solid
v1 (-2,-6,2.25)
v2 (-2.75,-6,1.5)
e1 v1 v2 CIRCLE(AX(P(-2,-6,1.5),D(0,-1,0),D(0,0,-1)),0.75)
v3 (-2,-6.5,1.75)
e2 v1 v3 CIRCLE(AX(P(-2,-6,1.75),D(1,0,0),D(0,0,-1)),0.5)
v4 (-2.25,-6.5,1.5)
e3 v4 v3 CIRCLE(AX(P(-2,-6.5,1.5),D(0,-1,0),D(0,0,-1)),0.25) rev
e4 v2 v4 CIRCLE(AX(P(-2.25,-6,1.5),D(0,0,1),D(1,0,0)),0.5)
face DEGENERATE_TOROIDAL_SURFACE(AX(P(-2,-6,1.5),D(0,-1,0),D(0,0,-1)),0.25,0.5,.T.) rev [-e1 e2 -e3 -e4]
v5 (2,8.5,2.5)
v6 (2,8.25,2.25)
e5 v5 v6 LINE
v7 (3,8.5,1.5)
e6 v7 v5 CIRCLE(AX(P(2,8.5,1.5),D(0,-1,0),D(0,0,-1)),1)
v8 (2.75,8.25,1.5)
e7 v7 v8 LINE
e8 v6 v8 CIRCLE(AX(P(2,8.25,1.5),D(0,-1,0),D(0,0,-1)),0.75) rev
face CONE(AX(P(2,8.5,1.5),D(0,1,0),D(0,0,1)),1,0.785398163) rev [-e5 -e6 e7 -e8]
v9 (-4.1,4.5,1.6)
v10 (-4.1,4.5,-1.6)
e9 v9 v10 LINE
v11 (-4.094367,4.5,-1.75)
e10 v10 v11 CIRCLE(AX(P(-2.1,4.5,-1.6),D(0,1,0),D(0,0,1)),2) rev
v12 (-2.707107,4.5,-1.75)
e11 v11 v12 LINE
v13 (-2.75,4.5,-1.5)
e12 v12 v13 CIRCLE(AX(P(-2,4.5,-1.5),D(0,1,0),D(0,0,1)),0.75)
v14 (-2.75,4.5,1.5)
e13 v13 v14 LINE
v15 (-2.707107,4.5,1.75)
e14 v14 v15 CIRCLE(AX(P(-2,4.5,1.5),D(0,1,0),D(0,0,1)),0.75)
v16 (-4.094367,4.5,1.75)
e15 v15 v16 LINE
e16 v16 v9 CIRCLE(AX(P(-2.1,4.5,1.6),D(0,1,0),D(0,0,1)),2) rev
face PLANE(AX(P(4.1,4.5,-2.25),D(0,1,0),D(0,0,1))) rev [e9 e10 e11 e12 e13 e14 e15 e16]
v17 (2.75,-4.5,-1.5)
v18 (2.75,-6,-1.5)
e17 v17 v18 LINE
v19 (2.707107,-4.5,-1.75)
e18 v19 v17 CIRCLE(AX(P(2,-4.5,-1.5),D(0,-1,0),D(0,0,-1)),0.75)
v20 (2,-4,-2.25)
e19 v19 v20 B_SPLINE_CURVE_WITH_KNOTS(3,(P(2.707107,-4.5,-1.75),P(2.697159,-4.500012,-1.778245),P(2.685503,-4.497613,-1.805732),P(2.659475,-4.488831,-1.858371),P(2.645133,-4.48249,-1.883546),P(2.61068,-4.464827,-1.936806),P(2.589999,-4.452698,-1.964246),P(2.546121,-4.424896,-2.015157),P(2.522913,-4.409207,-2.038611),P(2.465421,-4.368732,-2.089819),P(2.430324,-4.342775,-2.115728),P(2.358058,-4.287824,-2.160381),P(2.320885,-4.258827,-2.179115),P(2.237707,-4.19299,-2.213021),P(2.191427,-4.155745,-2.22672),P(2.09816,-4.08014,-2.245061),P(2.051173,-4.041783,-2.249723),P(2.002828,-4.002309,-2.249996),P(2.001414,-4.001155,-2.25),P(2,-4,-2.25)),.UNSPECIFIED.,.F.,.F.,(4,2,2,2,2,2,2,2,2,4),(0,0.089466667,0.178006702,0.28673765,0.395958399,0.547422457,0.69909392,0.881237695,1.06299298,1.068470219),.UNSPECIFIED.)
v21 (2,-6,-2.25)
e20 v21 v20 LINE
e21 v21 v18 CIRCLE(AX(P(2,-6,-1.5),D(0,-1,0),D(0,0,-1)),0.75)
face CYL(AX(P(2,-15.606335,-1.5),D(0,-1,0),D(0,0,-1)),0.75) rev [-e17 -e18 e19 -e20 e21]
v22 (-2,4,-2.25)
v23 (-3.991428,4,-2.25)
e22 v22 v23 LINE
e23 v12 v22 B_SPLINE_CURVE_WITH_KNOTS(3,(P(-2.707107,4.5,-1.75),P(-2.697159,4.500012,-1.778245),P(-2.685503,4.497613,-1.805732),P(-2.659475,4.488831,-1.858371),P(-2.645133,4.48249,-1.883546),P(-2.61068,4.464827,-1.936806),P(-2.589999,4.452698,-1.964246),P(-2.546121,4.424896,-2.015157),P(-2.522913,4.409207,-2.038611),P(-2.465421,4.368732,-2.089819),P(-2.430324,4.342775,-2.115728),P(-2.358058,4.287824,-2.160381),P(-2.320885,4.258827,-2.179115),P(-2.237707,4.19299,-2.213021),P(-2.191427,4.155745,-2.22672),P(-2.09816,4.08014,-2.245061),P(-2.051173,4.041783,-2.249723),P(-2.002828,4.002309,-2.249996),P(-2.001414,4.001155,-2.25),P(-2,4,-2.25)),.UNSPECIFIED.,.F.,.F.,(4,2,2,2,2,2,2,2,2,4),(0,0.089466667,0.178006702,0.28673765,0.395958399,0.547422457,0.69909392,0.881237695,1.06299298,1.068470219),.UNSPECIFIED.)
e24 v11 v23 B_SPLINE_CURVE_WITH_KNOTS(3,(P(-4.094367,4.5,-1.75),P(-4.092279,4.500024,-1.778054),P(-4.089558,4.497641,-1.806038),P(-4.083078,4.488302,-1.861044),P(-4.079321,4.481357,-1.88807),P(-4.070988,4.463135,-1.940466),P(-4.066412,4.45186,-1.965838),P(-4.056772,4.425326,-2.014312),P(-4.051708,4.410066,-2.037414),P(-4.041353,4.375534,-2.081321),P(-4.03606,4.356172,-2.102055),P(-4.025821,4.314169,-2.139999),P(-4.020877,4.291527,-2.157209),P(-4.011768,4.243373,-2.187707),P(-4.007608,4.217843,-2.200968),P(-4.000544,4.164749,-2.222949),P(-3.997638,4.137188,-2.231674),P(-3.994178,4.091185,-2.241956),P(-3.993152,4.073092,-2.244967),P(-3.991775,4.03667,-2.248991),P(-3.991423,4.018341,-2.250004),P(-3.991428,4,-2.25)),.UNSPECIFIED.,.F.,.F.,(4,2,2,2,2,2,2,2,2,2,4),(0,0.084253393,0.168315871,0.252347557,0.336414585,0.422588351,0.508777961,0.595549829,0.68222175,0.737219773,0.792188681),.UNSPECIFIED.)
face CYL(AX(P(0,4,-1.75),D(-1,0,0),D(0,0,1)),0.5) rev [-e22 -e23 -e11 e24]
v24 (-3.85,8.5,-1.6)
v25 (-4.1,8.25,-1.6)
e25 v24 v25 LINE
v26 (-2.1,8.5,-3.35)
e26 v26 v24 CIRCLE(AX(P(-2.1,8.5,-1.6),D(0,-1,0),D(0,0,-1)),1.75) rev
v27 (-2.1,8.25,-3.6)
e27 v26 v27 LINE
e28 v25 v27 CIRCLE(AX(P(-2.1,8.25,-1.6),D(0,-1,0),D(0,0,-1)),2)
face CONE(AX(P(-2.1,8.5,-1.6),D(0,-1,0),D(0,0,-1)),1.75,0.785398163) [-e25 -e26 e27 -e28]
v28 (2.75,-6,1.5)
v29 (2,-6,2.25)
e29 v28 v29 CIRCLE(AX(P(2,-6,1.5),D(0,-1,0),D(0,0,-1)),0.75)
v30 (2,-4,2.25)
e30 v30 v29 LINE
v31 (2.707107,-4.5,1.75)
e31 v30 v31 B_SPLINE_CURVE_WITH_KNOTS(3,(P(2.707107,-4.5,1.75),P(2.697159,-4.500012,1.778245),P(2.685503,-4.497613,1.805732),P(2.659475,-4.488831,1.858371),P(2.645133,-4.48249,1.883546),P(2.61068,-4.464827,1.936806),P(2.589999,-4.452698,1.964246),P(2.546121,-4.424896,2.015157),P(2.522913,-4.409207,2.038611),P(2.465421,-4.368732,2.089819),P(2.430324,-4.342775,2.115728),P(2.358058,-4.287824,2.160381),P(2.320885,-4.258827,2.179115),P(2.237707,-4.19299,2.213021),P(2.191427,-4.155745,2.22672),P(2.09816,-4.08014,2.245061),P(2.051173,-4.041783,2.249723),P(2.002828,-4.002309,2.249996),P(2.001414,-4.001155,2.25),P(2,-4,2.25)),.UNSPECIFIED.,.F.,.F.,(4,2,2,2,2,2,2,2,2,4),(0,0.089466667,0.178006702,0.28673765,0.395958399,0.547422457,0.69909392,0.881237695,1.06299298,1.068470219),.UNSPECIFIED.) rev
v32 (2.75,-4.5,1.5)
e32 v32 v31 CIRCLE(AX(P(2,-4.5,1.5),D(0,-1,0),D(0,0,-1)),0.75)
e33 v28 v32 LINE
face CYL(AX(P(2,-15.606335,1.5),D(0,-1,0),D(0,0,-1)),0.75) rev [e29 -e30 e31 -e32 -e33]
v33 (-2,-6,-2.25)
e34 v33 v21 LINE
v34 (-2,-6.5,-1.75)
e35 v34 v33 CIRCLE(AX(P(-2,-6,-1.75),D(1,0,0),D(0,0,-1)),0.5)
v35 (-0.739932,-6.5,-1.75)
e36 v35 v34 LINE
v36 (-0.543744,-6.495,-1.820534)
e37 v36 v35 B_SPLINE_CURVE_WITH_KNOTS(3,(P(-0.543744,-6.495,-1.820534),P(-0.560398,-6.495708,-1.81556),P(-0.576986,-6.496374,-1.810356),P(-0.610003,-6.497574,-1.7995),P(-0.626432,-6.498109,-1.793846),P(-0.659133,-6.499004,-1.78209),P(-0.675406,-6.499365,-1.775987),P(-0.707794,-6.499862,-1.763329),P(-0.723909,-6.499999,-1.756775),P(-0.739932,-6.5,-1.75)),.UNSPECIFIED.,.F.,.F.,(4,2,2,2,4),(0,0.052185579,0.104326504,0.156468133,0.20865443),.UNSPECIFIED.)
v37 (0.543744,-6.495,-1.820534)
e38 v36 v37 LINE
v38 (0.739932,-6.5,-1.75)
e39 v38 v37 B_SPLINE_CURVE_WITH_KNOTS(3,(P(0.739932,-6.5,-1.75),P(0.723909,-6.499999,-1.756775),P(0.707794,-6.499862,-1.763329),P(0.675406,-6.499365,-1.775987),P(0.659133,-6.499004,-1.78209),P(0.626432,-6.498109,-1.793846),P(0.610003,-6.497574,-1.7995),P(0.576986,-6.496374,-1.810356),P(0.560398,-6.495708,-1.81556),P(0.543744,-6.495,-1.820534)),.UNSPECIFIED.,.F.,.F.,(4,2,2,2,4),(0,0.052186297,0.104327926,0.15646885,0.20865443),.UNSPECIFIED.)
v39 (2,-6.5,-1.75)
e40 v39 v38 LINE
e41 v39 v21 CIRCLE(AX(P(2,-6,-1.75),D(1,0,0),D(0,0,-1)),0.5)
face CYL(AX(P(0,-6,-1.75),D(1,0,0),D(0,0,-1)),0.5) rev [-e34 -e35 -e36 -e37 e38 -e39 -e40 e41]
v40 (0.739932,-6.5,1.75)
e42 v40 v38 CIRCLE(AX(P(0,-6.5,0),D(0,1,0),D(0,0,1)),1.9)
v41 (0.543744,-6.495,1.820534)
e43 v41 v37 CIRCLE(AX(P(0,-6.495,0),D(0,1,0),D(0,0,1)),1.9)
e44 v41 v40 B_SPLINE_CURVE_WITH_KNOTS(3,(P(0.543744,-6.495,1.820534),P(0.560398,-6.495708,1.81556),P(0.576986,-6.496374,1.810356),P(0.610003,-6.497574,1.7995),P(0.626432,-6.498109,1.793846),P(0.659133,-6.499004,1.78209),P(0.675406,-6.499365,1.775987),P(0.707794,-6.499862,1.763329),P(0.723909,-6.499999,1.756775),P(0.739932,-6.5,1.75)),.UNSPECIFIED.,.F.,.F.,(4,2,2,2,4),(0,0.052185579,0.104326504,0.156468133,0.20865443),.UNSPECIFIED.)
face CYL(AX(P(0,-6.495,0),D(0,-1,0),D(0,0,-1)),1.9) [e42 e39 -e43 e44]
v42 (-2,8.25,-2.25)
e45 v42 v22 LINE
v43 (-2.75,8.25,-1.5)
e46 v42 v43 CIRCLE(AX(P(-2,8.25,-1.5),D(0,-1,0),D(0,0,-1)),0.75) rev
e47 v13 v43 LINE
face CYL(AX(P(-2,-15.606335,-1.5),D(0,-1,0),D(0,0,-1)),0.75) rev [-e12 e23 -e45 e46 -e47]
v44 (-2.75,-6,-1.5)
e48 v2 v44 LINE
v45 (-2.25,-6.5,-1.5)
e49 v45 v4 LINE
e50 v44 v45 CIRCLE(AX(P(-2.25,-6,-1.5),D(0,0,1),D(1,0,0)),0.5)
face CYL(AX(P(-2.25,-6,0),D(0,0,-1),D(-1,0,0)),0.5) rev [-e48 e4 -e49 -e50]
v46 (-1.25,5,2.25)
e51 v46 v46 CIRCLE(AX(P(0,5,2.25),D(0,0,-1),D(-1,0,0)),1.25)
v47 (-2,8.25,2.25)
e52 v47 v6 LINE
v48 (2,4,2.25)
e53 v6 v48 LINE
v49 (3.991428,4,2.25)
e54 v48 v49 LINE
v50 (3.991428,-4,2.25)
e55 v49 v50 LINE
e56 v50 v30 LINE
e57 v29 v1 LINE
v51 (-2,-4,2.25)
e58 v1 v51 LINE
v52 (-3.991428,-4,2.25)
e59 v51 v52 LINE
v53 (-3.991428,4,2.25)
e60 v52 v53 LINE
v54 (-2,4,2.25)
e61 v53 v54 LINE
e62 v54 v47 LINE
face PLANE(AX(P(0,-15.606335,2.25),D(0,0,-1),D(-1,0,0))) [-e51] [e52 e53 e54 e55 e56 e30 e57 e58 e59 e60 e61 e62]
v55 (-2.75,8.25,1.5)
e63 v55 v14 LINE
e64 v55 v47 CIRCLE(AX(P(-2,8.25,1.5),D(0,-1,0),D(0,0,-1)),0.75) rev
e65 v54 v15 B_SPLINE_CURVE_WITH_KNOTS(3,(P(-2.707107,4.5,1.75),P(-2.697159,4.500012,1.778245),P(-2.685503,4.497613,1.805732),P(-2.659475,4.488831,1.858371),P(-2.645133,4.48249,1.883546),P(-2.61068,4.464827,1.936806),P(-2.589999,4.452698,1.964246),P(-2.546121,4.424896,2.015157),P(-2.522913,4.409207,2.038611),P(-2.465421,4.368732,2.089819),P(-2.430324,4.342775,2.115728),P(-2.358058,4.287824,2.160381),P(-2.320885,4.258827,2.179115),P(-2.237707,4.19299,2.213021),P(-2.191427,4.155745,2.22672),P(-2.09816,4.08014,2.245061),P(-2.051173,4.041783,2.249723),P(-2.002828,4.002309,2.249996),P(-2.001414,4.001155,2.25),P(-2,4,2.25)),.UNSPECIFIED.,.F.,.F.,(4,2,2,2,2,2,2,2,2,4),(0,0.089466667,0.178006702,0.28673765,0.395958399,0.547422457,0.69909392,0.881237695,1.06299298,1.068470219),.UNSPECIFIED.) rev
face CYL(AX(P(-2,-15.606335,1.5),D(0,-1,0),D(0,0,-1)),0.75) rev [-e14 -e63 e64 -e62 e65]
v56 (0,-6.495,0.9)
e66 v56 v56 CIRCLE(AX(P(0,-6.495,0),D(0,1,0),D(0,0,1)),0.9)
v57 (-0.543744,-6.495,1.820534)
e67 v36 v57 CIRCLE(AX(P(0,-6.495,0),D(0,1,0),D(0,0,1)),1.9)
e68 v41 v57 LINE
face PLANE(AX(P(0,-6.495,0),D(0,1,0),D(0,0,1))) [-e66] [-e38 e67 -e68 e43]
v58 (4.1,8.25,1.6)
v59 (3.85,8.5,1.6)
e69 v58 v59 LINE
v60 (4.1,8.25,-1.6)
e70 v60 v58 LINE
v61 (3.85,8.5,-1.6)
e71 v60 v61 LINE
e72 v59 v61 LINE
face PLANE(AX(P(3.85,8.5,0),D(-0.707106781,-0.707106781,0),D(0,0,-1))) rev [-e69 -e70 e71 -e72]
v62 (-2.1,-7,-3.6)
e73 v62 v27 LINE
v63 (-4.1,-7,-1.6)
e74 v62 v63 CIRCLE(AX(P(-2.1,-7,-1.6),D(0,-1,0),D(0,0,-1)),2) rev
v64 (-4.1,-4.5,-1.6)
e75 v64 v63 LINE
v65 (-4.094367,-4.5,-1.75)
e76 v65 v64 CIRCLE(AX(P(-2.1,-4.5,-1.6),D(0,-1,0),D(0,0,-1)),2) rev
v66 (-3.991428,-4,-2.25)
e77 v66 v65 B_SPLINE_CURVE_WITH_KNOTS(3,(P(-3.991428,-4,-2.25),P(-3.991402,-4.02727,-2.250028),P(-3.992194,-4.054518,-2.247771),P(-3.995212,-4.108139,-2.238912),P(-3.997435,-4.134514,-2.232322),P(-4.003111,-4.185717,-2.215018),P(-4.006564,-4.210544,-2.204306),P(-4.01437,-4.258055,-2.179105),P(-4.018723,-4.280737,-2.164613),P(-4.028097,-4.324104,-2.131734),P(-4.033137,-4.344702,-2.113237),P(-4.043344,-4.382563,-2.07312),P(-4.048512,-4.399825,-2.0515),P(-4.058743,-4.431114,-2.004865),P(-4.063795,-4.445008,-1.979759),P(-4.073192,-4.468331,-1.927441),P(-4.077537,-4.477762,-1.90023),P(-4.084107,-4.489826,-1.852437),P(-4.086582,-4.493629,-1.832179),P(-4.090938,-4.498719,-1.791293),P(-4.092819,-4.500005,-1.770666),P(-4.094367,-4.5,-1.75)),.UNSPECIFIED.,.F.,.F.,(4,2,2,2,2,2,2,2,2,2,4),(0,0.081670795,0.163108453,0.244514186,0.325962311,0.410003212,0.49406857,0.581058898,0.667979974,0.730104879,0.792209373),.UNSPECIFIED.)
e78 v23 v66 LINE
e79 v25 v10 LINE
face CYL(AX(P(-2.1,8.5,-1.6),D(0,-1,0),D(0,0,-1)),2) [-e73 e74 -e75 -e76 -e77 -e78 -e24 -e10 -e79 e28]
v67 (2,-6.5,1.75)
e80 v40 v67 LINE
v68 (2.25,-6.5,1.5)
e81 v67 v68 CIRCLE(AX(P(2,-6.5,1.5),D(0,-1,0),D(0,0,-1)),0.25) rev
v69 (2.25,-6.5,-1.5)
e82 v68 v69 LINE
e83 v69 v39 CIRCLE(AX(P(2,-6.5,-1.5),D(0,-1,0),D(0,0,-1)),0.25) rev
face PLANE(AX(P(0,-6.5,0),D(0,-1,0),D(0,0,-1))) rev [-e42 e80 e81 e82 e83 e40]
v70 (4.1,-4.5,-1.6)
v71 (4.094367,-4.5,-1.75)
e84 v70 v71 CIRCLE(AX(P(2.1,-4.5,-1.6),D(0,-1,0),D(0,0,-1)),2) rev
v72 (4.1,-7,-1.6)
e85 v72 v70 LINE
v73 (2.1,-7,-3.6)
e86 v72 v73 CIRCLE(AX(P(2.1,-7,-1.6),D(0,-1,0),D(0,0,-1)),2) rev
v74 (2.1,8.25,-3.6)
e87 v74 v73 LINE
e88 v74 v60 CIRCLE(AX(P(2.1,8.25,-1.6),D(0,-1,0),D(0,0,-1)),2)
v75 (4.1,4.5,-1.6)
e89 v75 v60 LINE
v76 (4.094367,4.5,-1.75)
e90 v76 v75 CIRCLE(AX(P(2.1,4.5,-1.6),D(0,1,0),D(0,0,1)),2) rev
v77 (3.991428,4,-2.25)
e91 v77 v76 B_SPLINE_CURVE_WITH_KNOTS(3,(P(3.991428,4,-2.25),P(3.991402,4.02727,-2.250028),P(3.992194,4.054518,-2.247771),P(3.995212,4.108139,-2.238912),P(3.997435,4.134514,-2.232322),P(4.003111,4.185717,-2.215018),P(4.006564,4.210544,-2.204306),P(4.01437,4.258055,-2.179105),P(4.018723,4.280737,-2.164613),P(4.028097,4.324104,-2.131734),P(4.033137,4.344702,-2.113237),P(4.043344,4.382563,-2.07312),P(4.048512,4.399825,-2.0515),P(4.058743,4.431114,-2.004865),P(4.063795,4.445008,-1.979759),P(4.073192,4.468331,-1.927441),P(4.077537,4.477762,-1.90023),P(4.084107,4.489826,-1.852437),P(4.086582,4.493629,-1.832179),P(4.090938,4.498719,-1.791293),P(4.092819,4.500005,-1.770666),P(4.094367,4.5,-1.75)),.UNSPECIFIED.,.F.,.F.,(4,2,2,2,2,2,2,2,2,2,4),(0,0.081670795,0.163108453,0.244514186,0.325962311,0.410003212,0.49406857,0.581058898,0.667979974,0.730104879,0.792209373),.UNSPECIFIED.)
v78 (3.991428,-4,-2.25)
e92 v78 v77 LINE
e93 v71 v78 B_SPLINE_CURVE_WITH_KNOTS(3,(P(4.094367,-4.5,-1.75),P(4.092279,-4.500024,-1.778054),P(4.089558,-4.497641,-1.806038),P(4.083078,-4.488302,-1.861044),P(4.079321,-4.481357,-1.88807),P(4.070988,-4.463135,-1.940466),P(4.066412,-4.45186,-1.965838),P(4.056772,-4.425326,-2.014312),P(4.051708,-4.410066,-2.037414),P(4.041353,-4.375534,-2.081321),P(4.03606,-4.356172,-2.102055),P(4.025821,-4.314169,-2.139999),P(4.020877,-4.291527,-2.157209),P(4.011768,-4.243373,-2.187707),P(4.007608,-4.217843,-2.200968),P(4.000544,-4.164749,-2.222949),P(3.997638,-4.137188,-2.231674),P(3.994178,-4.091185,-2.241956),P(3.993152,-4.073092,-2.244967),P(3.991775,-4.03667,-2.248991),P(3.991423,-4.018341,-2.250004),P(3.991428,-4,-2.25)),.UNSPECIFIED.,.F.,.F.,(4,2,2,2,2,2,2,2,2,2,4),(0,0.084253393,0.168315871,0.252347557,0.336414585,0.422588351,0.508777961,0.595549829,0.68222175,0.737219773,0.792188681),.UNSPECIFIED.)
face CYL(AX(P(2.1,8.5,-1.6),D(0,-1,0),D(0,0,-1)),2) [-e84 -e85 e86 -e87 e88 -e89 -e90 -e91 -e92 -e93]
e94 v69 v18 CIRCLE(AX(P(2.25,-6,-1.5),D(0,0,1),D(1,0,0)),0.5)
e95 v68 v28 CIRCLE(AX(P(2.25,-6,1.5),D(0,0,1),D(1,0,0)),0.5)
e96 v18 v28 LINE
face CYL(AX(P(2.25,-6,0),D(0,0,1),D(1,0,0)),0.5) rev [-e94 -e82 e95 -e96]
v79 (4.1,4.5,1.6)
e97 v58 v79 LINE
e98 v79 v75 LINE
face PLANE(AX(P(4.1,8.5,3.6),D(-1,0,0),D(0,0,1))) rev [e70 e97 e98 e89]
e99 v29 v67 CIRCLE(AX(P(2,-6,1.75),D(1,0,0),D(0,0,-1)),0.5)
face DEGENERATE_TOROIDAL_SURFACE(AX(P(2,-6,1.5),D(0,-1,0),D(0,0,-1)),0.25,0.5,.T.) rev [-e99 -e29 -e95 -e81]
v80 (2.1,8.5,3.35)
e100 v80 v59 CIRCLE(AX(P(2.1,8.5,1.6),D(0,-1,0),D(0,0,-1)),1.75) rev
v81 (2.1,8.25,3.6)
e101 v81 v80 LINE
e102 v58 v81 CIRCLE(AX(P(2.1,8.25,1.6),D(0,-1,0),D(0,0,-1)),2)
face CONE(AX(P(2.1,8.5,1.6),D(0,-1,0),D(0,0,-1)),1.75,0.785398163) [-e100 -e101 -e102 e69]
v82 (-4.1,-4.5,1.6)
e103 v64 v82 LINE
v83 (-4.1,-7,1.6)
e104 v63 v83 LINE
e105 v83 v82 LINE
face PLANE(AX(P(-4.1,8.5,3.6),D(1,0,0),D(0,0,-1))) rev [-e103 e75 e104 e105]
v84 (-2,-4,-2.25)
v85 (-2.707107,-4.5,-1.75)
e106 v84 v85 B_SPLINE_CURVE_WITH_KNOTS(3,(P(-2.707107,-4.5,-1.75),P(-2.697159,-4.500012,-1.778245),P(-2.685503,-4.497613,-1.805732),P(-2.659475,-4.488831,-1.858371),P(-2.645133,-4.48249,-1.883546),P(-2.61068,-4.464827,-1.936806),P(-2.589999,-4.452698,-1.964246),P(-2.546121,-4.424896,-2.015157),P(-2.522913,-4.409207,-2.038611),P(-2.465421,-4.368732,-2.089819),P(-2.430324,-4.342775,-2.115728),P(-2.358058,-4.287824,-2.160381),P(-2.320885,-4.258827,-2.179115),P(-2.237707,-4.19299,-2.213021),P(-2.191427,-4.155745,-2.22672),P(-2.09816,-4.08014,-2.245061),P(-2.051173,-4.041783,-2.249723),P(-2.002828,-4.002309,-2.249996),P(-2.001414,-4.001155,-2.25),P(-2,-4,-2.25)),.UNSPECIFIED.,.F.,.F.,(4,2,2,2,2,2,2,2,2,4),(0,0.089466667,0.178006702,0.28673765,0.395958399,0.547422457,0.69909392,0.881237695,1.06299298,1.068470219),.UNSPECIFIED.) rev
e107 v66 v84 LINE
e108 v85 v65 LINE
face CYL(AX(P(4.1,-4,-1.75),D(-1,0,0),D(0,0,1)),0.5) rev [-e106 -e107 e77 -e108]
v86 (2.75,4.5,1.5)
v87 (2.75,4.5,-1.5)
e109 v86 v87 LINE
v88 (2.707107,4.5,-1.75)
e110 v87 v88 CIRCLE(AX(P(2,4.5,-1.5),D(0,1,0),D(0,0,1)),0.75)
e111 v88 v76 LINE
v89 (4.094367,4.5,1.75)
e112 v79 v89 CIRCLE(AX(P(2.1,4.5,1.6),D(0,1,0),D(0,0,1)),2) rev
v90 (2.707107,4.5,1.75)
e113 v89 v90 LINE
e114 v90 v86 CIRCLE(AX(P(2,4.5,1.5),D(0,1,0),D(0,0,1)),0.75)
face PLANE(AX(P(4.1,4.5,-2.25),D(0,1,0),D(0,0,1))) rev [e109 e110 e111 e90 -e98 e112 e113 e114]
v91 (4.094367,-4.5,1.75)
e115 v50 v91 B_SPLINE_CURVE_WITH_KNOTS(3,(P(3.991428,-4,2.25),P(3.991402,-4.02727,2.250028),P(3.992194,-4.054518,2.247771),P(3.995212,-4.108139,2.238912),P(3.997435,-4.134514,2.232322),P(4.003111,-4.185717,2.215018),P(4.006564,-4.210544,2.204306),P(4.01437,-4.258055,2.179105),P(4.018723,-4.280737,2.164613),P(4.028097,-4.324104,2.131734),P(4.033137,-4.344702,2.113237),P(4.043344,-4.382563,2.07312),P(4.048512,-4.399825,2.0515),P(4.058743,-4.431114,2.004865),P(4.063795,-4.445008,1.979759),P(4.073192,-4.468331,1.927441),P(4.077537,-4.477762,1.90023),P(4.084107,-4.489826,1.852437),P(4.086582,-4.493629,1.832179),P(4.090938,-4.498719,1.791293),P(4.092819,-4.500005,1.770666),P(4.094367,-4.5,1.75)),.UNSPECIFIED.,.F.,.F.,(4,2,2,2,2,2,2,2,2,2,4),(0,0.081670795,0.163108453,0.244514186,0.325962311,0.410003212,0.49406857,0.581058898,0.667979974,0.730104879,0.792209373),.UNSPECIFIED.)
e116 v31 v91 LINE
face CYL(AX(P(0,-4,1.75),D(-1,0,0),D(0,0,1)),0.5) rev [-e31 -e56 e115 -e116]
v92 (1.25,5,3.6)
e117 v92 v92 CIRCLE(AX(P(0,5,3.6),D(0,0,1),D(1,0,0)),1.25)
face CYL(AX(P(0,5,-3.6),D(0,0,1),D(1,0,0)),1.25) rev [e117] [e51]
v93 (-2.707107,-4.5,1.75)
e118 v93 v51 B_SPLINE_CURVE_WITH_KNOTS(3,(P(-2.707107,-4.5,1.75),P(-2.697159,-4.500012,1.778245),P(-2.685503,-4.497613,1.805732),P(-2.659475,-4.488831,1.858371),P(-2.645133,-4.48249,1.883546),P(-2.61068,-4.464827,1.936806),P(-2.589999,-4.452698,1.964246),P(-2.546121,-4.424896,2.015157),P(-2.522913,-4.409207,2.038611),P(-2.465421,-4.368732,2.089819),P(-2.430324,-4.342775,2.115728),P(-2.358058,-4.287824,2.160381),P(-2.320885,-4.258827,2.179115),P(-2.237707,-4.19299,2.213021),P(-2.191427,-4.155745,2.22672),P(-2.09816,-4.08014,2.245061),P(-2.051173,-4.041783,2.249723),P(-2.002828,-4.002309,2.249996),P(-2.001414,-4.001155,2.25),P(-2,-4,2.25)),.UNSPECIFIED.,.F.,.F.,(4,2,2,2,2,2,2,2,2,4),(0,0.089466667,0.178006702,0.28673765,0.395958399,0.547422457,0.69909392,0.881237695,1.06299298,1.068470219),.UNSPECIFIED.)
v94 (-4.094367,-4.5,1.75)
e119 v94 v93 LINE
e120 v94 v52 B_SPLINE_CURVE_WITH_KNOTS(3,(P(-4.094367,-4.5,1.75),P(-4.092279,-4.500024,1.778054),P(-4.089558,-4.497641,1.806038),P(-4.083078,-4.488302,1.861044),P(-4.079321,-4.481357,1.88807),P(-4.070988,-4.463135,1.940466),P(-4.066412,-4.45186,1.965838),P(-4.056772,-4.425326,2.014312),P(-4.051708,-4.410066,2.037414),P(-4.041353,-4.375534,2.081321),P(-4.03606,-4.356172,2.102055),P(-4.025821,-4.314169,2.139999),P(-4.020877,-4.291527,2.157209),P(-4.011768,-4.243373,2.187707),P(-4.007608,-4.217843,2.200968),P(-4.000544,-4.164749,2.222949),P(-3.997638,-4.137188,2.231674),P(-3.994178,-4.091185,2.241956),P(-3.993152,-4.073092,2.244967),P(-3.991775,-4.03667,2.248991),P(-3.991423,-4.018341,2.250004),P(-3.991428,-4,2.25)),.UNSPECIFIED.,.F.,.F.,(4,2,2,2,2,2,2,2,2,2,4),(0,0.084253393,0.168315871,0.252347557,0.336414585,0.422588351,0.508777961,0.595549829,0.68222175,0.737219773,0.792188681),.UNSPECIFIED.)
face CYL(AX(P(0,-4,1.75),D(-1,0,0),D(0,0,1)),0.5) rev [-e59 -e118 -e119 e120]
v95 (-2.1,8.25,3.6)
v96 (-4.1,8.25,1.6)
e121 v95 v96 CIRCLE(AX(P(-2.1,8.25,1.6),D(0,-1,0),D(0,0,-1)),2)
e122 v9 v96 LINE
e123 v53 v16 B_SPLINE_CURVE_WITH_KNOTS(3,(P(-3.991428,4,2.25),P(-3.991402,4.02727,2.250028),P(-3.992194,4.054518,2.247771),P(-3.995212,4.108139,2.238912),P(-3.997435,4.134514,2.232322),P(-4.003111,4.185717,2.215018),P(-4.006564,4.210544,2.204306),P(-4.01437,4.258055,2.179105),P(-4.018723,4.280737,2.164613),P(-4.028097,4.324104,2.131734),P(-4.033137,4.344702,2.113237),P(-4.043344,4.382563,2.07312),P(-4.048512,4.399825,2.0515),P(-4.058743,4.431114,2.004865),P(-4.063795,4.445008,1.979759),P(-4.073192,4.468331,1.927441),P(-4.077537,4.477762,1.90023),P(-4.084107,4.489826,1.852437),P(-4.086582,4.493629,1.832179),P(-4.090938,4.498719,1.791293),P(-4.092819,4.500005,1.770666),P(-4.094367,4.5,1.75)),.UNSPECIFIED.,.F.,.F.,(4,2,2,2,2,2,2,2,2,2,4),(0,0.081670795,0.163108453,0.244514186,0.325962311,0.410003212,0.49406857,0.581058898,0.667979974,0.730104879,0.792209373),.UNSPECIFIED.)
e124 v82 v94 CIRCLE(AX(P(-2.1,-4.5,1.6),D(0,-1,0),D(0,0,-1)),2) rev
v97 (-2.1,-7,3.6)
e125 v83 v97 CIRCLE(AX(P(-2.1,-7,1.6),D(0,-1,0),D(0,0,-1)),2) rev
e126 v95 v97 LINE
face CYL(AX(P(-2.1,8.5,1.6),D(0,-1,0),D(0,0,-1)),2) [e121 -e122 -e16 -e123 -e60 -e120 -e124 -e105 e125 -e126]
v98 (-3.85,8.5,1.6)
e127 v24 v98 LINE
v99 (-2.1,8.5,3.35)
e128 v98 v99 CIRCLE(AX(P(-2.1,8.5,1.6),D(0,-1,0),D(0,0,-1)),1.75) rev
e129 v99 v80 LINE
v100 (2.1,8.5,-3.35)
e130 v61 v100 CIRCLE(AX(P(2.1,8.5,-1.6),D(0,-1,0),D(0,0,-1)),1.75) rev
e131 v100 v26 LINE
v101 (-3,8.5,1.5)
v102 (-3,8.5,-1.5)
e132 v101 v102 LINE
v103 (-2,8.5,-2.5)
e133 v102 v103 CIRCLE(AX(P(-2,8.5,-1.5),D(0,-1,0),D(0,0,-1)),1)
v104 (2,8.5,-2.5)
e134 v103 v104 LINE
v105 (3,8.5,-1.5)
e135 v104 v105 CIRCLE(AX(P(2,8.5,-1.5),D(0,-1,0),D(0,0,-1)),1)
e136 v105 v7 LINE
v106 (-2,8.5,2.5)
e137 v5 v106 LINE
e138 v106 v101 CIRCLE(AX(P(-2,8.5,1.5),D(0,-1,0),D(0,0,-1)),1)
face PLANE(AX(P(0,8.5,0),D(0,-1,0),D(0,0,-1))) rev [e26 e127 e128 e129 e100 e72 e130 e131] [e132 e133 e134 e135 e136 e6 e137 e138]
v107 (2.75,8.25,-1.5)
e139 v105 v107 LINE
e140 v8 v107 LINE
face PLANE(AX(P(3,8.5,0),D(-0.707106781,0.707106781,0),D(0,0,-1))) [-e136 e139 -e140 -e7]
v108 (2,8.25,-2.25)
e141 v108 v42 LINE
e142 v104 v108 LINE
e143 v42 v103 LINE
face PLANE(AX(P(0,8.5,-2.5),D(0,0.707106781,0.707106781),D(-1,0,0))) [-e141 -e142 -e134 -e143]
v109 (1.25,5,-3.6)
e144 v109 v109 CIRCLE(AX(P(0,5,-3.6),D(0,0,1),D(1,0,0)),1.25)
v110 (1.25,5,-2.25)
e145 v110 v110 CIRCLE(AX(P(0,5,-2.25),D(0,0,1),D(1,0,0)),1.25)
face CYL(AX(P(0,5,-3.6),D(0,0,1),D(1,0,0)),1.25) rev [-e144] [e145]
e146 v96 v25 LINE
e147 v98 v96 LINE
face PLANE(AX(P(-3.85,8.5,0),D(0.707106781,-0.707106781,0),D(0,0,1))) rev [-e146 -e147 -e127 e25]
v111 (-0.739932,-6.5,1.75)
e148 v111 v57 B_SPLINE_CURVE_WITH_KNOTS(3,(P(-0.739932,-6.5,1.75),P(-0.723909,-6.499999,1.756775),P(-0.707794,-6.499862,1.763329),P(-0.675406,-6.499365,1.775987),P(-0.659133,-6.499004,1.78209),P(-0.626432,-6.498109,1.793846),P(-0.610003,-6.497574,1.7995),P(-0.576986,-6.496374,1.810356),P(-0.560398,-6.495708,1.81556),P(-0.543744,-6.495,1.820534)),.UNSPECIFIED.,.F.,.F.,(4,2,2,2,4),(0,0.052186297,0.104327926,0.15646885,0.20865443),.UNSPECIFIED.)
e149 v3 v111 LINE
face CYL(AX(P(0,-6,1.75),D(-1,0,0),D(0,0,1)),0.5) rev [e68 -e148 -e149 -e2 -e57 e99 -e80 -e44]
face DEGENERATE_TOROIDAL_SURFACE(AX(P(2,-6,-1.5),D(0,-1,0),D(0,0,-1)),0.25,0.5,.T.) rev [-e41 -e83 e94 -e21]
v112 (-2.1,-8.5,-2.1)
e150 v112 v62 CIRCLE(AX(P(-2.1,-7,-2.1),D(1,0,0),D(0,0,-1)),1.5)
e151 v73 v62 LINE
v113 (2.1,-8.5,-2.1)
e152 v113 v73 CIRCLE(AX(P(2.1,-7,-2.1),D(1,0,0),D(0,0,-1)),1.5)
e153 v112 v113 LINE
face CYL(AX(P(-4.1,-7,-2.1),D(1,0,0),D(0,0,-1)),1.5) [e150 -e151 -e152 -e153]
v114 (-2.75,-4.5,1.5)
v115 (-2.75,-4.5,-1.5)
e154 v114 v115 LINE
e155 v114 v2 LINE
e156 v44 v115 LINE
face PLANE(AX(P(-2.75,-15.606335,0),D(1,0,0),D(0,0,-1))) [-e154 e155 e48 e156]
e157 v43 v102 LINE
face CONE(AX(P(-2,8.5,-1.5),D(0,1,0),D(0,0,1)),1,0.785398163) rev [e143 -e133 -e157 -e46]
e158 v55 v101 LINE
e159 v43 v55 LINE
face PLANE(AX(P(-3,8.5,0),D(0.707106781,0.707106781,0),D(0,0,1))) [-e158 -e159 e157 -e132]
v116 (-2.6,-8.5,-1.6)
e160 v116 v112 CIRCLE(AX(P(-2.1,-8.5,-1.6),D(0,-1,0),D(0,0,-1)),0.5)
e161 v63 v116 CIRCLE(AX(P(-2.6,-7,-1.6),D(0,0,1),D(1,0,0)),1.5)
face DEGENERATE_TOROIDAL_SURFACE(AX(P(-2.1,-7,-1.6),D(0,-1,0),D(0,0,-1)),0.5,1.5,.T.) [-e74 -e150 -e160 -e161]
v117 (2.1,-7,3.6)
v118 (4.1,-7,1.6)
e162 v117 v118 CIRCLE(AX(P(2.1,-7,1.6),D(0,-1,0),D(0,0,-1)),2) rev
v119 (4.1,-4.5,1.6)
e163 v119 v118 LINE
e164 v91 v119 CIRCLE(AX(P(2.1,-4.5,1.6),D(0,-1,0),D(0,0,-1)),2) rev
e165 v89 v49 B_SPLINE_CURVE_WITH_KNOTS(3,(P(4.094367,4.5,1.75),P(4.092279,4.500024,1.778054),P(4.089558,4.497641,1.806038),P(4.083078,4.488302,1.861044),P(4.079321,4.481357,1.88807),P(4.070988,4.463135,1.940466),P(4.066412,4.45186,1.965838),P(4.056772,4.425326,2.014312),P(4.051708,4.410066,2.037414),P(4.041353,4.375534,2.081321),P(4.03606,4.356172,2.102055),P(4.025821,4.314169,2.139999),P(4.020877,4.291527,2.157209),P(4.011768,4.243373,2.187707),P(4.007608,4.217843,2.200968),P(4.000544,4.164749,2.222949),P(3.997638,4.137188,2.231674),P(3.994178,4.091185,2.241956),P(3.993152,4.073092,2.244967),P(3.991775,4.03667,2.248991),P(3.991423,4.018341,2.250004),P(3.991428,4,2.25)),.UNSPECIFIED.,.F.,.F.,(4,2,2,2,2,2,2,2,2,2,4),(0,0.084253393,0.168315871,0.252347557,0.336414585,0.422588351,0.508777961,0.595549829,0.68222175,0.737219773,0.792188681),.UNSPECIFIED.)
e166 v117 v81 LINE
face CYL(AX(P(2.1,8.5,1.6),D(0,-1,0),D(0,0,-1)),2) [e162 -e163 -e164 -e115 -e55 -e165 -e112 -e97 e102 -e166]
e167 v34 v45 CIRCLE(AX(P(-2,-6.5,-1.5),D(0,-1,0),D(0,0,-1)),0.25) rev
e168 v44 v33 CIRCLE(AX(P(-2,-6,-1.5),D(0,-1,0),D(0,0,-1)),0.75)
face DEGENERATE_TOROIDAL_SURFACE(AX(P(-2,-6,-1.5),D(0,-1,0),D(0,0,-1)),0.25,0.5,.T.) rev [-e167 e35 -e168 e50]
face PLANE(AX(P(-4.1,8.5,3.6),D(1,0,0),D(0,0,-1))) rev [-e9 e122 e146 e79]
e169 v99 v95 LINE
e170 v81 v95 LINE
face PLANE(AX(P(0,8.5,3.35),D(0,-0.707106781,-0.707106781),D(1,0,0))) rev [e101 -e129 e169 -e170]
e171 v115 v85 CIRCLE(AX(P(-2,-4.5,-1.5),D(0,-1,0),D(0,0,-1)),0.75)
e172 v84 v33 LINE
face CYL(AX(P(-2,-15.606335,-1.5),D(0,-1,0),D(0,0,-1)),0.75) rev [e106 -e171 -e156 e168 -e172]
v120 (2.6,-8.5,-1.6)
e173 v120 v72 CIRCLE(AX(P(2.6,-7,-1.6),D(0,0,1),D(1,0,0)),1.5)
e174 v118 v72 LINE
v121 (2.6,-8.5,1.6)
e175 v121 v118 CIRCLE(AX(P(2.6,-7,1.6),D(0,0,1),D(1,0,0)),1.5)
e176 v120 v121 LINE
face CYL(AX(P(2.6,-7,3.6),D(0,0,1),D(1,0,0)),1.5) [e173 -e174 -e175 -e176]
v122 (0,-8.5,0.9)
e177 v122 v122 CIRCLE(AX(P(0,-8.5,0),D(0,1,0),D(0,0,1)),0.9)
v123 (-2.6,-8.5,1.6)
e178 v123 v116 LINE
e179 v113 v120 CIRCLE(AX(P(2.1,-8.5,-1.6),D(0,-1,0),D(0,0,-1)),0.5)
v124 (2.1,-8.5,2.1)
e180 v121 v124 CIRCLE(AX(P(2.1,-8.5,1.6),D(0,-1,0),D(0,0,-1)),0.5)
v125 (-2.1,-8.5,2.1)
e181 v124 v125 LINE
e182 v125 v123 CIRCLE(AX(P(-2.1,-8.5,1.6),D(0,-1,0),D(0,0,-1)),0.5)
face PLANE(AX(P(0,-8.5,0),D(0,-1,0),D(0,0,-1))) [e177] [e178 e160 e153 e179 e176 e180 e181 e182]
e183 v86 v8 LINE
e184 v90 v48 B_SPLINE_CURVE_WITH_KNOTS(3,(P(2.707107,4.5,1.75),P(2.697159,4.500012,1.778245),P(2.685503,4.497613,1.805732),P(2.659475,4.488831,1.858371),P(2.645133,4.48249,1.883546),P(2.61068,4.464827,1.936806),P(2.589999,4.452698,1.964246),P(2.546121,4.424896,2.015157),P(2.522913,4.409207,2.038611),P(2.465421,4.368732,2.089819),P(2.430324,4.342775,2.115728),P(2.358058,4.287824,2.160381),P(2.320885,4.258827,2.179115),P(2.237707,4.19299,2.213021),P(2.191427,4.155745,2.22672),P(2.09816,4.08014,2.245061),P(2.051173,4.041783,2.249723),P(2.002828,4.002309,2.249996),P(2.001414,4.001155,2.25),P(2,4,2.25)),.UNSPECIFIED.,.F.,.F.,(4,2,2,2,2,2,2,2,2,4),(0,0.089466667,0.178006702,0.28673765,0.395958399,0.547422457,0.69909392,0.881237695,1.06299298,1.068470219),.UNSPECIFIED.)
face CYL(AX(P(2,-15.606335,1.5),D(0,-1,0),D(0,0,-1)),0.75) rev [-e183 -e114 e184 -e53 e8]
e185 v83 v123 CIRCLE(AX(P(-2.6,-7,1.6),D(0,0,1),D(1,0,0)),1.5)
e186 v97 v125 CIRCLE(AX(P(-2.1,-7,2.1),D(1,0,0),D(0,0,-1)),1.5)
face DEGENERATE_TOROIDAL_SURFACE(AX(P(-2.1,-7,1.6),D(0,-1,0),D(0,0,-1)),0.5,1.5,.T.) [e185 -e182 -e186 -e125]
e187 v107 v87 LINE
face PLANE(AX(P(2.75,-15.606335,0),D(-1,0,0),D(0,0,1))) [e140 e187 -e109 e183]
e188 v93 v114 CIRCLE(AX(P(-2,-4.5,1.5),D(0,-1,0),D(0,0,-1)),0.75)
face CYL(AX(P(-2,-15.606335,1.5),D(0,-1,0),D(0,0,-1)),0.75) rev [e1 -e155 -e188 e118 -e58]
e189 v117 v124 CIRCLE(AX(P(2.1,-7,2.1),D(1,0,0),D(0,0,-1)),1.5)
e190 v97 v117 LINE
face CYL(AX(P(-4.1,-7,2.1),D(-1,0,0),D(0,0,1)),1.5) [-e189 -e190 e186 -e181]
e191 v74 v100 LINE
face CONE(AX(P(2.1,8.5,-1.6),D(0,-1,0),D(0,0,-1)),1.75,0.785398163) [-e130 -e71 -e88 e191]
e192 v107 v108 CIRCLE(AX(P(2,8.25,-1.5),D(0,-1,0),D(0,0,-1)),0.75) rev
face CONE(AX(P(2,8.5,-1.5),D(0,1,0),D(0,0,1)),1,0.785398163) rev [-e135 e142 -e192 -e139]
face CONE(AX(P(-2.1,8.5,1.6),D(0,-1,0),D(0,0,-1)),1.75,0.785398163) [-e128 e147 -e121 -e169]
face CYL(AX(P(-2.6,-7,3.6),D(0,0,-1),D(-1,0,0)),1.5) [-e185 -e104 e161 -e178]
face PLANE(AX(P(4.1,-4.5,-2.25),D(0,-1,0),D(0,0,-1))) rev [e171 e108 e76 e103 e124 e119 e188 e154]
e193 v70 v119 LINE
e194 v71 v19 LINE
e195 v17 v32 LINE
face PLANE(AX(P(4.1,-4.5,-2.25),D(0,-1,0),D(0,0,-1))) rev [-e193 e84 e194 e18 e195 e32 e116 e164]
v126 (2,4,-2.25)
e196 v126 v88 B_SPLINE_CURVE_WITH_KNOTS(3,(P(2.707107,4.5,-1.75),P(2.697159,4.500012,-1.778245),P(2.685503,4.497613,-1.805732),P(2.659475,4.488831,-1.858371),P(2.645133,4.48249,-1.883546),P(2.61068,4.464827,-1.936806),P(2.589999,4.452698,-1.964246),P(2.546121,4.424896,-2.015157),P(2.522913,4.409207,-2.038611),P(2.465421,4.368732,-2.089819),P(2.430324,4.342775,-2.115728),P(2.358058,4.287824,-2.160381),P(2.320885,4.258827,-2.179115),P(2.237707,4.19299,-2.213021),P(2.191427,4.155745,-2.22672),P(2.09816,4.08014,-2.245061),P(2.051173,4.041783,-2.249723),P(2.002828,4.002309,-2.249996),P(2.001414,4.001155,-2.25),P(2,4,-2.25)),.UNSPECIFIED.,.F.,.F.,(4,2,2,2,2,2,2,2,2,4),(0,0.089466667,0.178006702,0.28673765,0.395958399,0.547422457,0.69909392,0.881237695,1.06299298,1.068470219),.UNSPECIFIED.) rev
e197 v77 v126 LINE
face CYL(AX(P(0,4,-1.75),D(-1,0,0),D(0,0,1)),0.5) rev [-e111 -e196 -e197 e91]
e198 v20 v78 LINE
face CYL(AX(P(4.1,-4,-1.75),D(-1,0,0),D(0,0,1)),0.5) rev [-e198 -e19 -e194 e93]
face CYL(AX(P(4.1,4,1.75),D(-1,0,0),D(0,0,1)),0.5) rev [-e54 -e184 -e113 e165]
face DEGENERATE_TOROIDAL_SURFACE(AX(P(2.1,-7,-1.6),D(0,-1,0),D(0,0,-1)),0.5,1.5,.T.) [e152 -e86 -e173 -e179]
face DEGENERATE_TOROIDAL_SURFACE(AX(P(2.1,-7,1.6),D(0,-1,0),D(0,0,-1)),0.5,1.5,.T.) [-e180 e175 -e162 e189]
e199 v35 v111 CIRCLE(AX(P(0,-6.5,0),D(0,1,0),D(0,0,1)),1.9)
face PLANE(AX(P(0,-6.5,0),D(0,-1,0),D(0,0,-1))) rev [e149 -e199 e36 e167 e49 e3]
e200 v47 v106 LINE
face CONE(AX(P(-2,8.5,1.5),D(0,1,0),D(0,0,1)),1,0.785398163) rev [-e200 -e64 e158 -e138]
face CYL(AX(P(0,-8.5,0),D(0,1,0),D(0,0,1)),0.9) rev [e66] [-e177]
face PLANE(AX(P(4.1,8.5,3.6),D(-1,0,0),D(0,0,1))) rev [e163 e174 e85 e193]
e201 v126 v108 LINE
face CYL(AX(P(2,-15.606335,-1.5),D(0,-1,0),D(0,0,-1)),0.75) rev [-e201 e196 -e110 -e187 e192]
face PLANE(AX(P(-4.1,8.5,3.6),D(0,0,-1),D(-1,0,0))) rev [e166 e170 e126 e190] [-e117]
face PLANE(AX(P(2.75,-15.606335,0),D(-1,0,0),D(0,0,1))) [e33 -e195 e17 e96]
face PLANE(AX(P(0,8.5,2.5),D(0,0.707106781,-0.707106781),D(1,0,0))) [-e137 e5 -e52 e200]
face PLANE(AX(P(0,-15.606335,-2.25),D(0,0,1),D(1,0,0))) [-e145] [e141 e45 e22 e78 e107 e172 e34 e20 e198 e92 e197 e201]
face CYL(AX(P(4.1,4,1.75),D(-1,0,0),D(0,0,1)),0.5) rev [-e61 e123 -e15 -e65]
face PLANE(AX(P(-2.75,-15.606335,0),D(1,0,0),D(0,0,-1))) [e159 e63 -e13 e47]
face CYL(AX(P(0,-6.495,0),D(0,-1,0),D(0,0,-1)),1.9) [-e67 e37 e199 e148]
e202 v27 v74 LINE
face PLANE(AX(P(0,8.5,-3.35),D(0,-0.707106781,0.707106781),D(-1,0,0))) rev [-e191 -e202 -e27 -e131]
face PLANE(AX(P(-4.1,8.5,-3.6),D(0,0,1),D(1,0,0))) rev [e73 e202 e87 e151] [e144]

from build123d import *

# Parameters (mm, degrees)
SKETCH1_W                 = 8.2
SKETCH1_H                 = 7.2
BOSS_EXTRUDE1_DEPTH       = 8.5
SKETCH2_W                 = 0.25
SKETCH2_H                 = 0.25
SKETCH2_H_2               = 4
SKETCH2_W_2               = 5
CHAIN_DEPTH               = 15
F_2_5_MM_DOWEL_DEPTH      = 11.100495037
F_2_5_MM_DOWEL_DEPTH_BACK = 11.100495037
SKETCH3_R                 = 1.25
SKETCH4_R                 = 0.9
STEEL_CABLE_CHANNEL_DEPTH = 11.100495037
CRIMP_WINDOW_DEPTH        = 11.100495037
CRIMP_WINDOW_DEPTH_BACK   = 11.100495037
SKETCH7_W                 = 4.5
SKETCH7_H                 = 9
FILLET6_R                 = 0.75
FILLET7_R                 = 0.5
FILLET9_R                 = 0.5
FILLET3_R                 = 2
FILLET5_R                 = 1.5
CHAMFER1_SIZE             = 0.25
BOSS_EXTRUDE2_START       = 0.005
SKETCH5_R                 = 1.9
SKETCH5_R_2               = 0.9
BOSS_EXTRUDE2_DEPTH       = 0.005


with BuildPart() as part:
    # Sketch1 → Boss-Extrude1 (new, symmetric)
    with BuildSketch(Plane(origin=(0, 0, 0), x_dir=(1, 0, 0), z_dir=(0, 1, 0))):
        Rectangle(SKETCH1_W, SKETCH1_H)
    extrude(amount=BOSS_EXTRUDE1_DEPTH, both=True)

    # Sketch2 → chain (cut)
    with BuildSketch(Plane(origin=(0, 8.5, 0), x_dir=(1, 0, 0), z_dir=(0, 1, 0))):
        with Locations((-2.625, 2.125)):
            Rectangle(SKETCH2_W, SKETCH2_H)
        with Locations((-2.625, 0)):
            Rectangle(SKETCH2_W, SKETCH2_H_2)
        with Locations((0, 2.125)):
            Rectangle(SKETCH2_W_2, SKETCH2_H)
        Rectangle(SKETCH2_W_2, SKETCH2_H_2)
        with Locations((2.625, 2.125)):
            Rectangle(SKETCH2_W, SKETCH2_H)
        with Locations((2.625, 0)):
            Rectangle(SKETCH2_W, SKETCH2_H_2)
        with Locations((2.625, -2.125)):
            Rectangle(SKETCH2_W, SKETCH2_H)
        with Locations((0, -2.125)):
            Rectangle(SKETCH2_W_2, SKETCH2_H)
        with Locations((-2.625, -2.125)):
            Rectangle(SKETCH2_W, SKETCH2_H)
    extrude(amount=-CHAIN_DEPTH, mode=Mode.SUBTRACT)

    # Sketch3 → 2.5 mm dowel (cut, two sides: drawn at the far end of the back side and taken through both)
    with BuildSketch(Plane.XY.offset(-F_2_5_MM_DOWEL_DEPTH_BACK)):
        with Locations((0, 5)):
            Circle(SKETCH3_R)
    extrude(amount=F_2_5_MM_DOWEL_DEPTH + F_2_5_MM_DOWEL_DEPTH_BACK, mode=Mode.SUBTRACT)

    # Sketch4 → steel cable channel (cut, through all)
    with BuildSketch(Plane(origin=(0, 0, 0), x_dir=(1, 0, 0), z_dir=(0, 1, 0))):
        with Locations(Location((0, 0, 0), (0, 0, 270))):
            Circle(SKETCH4_R)
    extrude(amount=-STEEL_CABLE_CHANNEL_DEPTH, mode=Mode.SUBTRACT)

    # Sketch7 → crimp window (cut, two sides: drawn at the far end of the back side and taken through both)
    with BuildSketch(Plane.ZY.offset(-CRIMP_WINDOW_DEPTH_BACK)):
        Rectangle(SKETCH7_W, SKETCH7_H)
    extrude(amount=CRIMP_WINDOW_DEPTH + CRIMP_WINDOW_DEPTH_BACK, mode=Mode.SUBTRACT)

    # Fillet6
    fillet6_edges = [part.edges().sort_by_distance(p)[0] for p in [
        (-2.75, -5.5, -2.25),
        (2.75, -5.5, -2.25),
        (2.75, -5.5, 2.25),
        (-2.75, -5.5, 2.25),
        (-2.75, 6.5, -2.25),
        (-2.75, 6.5, 2.25),
        (2.75, 6.5, 2.25),
        (2.75, 6.5, -2.25),
    ]]
    fillet(fillet6_edges, radius=FILLET6_R)

    # Fillet7
    fillet7_edges = [part.edges().sort_by_distance(p)[0] for p in [
        (2.75, -6.5, 0),
        (2.530330086, -6.5, -2.030330086),
        (2.530330086, -6.5, 2.030330086),
        (-2.530330086, -6.5, 2.030330086),
        (-2.530330086, -6.5, -2.030330086),
        (0, -6.5, -2.25),
        (0, -6.5, 2.25),
        (-2.75, -6.5, 0),
    ]]
    fillet(fillet7_edges, radius=FILLET7_R)

    # Fillet9
    fillet9_edges = [part.edges().sort_by_distance(p)[0] for p in [
        (3.05, 4.5, -2.25),
        (3.05, -4.5, 2.25),
        (3.05, 4.5, 2.25),
        (-3.05, 4.5, 2.25),
        (3.05, -4.5, -2.25),
        (-3.05, -4.5, -2.25),
        (-3.05, 4.5, -2.25),
        (-3.05, -4.5, 2.25),
    ]]
    fillet(fillet9_edges, radius=FILLET9_R)

    # Fillet3
    # the kernel refuses this fillet: 2 mm, written as the material it takes off along each edge
    with BuildSketch(Plane(origin=(-4.1, 13.5, -3.6), x_dir=(1, 0, 0), z_dir=(0, -1, 0)), Plane(origin=(4.1, -13.5, -3.6), x_dir=(-1, 0, 0), z_dir=(0, 1, 0))) as fillet3_piece_1:
        with BuildLine():
            CenterArc((FILLET3_R, FILLET3_R), FILLET3_R, 180, 90)
            Line((0, FILLET3_R), (0, 0))
            Line((0, 0), (FILLET3_R, 0))
        make_face()
    extrude(amount=27, mode=Mode.SUBTRACT)
    with BuildSketch(Plane(origin=(-4.1, 13.5, 3.6), x_dir=(1, 0, 0), z_dir=(0, -1, 0)), Plane(origin=(4.1, -13.5, 3.6), x_dir=(-1, 0, 0), z_dir=(0, 1, 0))) as fillet3_piece_2:
        with BuildLine():
            CenterArc((FILLET3_R, -FILLET3_R), FILLET3_R, 90, 90)
            Line((0, -FILLET3_R), (0, 0))
            Line((0, 0), (FILLET3_R, 0))
        make_face()
    extrude(amount=27, mode=Mode.SUBTRACT)

    # Fillet5
    fillet5_edges = [part.edges().sort_by_distance(p)[0] for p in [
        (-4.1, -8.5, 0),
        (4.1, -8.5, 0),
        (0, -8.5, 3.6),
        (0, -8.5, -3.6),
        (3.514213562, -8.5, 3.014213562),
        (3.514213562, -8.5, -3.014213562),
        (-3.514213562, -8.5, 3.014213562),
        (-3.514213562, -8.5, -3.014213562),
    ]]
    fillet(fillet5_edges, radius=FILLET5_R)

    # Chamfer1
    chamfer1_edges = [part.edges().sort_by_distance(p)[0] for p in [
        (2.530330086, 8.5, -2.030330086),
        (-2.530330086, 8.5, -2.030330086),
        (2.530330086, 8.5, 2.030330086),
        (-2.530330086, 8.5, 2.030330086),
        (-4.1, 8.5, 0),
        (0, 8.5, -3.6),
        (4.1, 8.5, 0),
        (0, 8.5, 3.6),
        (3.514213562, 8.5, 3.014213562),
        (3.514213562, 8.5, -3.014213562),
        (-3.514213562, 8.5, 3.014213562),
        (-3.514213562, 8.5, -3.014213562),
        (0, 8.5, -2.25),
        (2.75, 8.5, 0),
        (-2.75, 8.5, 0),
        (0, 8.5, 2.25),
    ]]
    chamfer(chamfer1_edges, length=CHAMFER1_SIZE)

    # Sketch5 → Boss-Extrude2 (add)
    with BuildSketch(Plane(origin=(0, -6.5, 0), x_dir=(1, 0, 0), z_dir=(0, 1, 0)).offset(BOSS_EXTRUDE2_START)):
        Circle(SKETCH5_R)
        with Locations(Location((0, 0, 0), (0, 0, 270))):
            Circle(SKETCH5_R_2, mode=Mode.SUBTRACT)
    extrude(amount=-BOSS_EXTRUDE2_DEPTH)


solid = part.part
